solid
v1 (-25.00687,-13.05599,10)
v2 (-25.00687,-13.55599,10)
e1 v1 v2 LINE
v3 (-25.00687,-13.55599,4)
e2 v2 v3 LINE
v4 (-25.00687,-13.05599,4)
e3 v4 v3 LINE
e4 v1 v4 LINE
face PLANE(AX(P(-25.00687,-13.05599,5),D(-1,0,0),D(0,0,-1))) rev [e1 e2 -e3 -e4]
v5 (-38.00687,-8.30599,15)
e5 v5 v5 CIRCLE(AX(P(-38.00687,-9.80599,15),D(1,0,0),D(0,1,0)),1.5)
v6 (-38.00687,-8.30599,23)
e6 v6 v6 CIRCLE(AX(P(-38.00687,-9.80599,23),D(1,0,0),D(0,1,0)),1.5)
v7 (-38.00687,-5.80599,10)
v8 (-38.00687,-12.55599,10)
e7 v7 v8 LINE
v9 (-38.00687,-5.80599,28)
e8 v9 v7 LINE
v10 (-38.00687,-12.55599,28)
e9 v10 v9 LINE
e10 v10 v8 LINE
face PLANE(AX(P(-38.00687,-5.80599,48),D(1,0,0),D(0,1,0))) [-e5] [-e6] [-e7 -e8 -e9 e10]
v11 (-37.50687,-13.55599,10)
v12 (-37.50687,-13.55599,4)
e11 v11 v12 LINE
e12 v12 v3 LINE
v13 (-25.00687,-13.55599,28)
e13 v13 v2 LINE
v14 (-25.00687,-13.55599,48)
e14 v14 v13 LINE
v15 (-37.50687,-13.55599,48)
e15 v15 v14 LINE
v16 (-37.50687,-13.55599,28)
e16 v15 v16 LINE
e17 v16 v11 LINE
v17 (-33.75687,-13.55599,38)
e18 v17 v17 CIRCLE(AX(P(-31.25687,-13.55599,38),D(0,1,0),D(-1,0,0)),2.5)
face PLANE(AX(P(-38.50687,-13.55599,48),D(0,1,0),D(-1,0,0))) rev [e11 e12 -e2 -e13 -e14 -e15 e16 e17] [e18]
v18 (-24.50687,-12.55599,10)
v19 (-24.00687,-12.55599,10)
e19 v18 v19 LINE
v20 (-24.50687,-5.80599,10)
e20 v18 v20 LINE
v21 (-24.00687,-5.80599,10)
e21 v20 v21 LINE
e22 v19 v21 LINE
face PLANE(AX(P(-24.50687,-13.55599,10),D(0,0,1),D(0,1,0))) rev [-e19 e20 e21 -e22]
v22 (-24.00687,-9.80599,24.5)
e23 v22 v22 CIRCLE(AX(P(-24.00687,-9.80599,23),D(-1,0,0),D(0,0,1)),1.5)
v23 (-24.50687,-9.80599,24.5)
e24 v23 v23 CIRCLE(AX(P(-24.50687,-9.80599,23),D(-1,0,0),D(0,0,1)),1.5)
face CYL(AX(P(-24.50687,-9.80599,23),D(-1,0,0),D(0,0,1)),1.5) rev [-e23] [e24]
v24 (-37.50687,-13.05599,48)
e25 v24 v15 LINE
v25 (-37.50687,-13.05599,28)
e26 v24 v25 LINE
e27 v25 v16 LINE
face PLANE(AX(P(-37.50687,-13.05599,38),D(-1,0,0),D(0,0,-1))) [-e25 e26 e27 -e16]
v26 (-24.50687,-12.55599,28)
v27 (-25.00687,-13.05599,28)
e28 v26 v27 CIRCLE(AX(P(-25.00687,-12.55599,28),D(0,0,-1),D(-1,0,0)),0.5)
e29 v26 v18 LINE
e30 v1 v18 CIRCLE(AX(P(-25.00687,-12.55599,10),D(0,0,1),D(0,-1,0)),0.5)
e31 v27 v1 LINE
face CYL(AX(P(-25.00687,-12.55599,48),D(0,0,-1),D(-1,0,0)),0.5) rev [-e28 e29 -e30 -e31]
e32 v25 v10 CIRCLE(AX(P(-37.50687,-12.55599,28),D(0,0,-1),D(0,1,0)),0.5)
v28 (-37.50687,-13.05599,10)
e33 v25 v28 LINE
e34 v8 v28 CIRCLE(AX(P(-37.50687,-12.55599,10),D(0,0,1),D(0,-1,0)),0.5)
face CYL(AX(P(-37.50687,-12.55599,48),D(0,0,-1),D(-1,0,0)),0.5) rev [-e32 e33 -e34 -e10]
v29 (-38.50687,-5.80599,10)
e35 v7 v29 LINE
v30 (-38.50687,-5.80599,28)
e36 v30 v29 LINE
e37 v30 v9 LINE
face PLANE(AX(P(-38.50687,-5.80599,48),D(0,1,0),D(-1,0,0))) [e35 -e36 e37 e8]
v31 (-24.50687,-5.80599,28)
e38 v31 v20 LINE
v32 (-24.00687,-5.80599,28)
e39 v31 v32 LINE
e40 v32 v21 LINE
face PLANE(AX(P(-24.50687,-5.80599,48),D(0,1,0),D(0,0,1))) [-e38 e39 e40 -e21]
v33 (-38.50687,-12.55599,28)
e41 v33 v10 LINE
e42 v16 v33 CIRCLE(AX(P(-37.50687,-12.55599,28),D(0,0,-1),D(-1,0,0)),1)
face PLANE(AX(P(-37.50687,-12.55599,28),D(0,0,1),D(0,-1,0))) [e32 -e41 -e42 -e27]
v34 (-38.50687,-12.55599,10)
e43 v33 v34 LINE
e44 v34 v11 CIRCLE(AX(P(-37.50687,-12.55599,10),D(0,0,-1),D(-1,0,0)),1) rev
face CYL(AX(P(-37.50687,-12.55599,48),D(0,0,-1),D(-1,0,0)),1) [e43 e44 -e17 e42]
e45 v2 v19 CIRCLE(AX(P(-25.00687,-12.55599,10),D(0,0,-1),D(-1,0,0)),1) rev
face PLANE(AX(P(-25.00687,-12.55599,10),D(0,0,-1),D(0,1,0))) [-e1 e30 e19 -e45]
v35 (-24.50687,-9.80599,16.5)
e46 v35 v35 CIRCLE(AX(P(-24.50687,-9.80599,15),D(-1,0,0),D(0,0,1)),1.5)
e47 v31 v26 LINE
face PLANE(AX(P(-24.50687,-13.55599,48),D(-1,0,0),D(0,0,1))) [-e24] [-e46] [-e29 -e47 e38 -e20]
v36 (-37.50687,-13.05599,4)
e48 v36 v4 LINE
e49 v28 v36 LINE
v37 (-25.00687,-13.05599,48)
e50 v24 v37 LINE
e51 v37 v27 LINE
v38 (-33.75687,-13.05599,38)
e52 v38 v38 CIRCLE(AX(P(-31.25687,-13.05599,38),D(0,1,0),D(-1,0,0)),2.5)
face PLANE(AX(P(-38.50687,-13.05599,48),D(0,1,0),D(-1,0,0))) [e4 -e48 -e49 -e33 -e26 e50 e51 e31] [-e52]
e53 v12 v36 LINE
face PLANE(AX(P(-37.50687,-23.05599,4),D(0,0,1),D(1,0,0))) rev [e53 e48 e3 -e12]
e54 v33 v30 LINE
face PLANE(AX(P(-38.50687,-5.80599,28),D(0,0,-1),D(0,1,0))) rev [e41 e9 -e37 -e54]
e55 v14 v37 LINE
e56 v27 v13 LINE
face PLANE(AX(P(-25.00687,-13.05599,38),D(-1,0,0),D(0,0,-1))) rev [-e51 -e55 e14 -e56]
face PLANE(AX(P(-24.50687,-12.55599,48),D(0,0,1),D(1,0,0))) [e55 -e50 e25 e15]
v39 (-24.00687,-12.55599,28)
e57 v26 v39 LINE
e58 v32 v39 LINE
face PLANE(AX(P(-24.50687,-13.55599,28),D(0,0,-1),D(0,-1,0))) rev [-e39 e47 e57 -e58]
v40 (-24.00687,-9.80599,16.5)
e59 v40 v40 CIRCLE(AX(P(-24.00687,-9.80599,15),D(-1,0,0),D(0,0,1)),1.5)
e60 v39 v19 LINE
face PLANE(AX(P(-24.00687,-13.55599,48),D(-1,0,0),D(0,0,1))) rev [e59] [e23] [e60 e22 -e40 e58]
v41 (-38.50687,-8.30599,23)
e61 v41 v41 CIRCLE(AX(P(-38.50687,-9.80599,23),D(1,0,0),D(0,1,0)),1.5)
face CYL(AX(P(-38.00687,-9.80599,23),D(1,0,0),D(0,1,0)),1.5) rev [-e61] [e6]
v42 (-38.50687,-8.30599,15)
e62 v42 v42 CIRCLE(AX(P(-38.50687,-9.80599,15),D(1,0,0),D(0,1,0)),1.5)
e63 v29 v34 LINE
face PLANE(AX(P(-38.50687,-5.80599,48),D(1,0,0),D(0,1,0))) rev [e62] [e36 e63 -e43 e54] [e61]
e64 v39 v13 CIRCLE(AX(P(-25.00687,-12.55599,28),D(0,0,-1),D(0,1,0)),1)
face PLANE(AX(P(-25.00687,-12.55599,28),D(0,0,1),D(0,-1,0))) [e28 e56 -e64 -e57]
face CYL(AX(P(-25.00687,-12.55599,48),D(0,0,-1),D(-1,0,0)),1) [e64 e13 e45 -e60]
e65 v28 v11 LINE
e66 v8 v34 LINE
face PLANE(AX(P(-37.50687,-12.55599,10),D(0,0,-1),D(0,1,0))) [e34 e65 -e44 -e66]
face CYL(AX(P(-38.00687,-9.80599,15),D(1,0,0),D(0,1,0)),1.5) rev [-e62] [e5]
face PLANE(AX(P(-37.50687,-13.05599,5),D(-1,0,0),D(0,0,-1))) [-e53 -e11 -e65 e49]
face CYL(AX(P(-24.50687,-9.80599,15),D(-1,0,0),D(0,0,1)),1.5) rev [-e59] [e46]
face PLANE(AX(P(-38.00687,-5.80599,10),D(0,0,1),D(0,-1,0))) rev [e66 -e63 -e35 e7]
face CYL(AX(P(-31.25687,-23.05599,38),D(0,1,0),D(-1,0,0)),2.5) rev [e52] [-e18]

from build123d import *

# Parameters (mm, degrees)
BRIDA_BASE1_DEPTH           = 48
CROQUIS5_R                  = 2.5
CORTAR_EXTRUIR1_DEPTH       = 10
CORTAR_EXTRUIR2_START       = 28
CORTAR_EXTRUIR2_DEPTH       = 20
CORTAR_EXTRUIR2_2_DEPTH     = 10
CORTAR_EXTRUIR2_START_2     = -38.506869712
CORTAR_EXTRUIR2_3_OUTLINE_R = 1.5
CORTAR_EXTRUIR2_3_DEPTH     = 14.5
CROQUIS7_W                  = 12.5
CROQUIS7_H                  = 4
CORTAR_EXTRUIR4_DEPTH       = 10


with BuildPart() as part:
    # Brida base1: sheet metal written as solids
    # Croquis1 → Brida base1 (new body)
    with BuildSketch(Plane.XY):
        with BuildLine():
            Line((-38.506869712, -5.805989848), (-38.506869712, -12.555989848))
            ThreePointArc((-38.506869712, -12.555989848), (-38.213976494, -13.263096629), (-37.506869712, -13.555989848))
            Line((-37.506869712, -13.555989848), (-25.006869712, -13.555989848))
            ThreePointArc((-25.006869712, -13.555989848), (-24.299762931, -13.263096629), (-24.006869712, -12.555989848))
            Line((-24.006869712, -12.555989848), (-24.006869712, -5.805989848))
            Line((-24.006869712, -5.805989848), (-24.506869712, -5.805989848))
            Line((-24.506869712, -5.805989848), (-24.506869712, -12.555989848))
            ThreePointArc((-24.506869712, -12.555989848), (-24.653316322, -12.909543238), (-25.006869712, -13.055989848))
            Line((-25.006869712, -13.055989848), (-37.506869712, -13.055989848))
            ThreePointArc((-37.506869712, -13.055989848), (-37.860423103, -12.909543238), (-38.006869712, -12.555989848))
            Line((-38.006869712, -12.555989848), (-38.006869712, -5.805989848))
            Line((-38.006869712, -5.805989848), (-38.506869712, -5.805989848))
        make_face()
    extrude(amount=BRIDA_BASE1_DEPTH)

    # Croquis5 → Cortar-Extruir1 (cut)
    with BuildSketch(Plane(origin=(0, -13.055989848, 0), x_dir=(1, 0, 0), z_dir=(0, 1, 0))):
        with Locations(Location((-31.256869712, -38, 0), (0, 0, 180))):
            Circle(CROQUIS5_R)
    extrude(amount=-CORTAR_EXTRUIR1_DEPTH, mode=Mode.SUBTRACT)

    # Cortar-Extruir2: read off the stored shape, not the designer's step
    # Cortar-Extruir2 outline → Cortar-Extruir2 (cut)
    with BuildSketch(Plane.XY.offset(CORTAR_EXTRUIR2_START)):
        with BuildLine():
            Line((-37.506869712, -13.555989848), (-37.506869712, -13.055989848))
            ThreePointArc((-37.506869712, -13.055989848), (-37.860423103, -12.909543239), (-38.006869712, -12.555989848))
            Line((-38.006869712, -12.555989848), (-38.006869712, -5.805989848))
            Line((-38.006869712, -5.805989848), (-38.506869712, -5.805989848))
            Line((-38.506869712, -5.805989848), (-38.506869712, -12.555989848))
            ThreePointArc((-38.506869712, -12.555989848), (-38.213976493, -13.26309663), (-37.506869712, -13.555989848))
        make_face()
        with BuildLine():
            ThreePointArc((-24.506869712, -12.555989848), (-24.653316322, -12.909543238), (-25.006869712, -13.055989848))
            Line((-25.006869712, -13.055989848), (-25.006869712, -13.555989848))
            ThreePointArc((-25.006869712, -13.555989848), (-24.299762931, -13.263096629), (-24.006869712, -12.555989848))
            Line((-24.006869712, -12.555989848), (-24.006869712, -5.805989848))
            Line((-24.006869712, -5.805989848), (-24.506869712, -5.805989848))
            Line((-24.506869712, -5.805989848), (-24.506869712, -12.555989848))
        make_face()
    extrude(amount=CORTAR_EXTRUIR2_DEPTH, mode=Mode.SUBTRACT)

    # Cortar-Extruir2 2 outline → Cortar-Extruir2 2 (cut)
    with BuildSketch(Plane.XY):
        with BuildLine():
            Line((-37.506869712, -13.555989848), (-37.506869712, -13.055989848))
            ThreePointArc((-37.506869712, -13.055989848), (-37.860423103, -12.909543239), (-38.006869712, -12.555989848))
            Line((-38.006869712, -12.555989848), (-38.006869712, -5.805989848))
            Line((-38.006869712, -5.805989848), (-38.506869712, -5.805989848))
            Line((-38.506869712, -5.805989848), (-38.506869712, -12.555989848))
            ThreePointArc((-38.506869712, -12.555989848), (-38.213976493, -13.26309663), (-37.506869712, -13.555989848))
        make_face()
        with BuildLine():
            ThreePointArc((-24.506869712, -12.555989848), (-24.653316322, -12.909543238), (-25.006869712, -13.055989848))
            Line((-25.006869712, -13.055989848), (-25.006869712, -13.555989848))
            ThreePointArc((-25.006869712, -13.555989848), (-24.299762931, -13.263096629), (-24.006869712, -12.555989848))
            Line((-24.006869712, -12.555989848), (-24.006869712, -5.805989848))
            Line((-24.006869712, -5.805989848), (-24.506869712, -5.805989848))
            Line((-24.506869712, -5.805989848), (-24.506869712, -12.555989848))
        make_face()
    extrude(amount=CORTAR_EXTRUIR2_2_DEPTH, mode=Mode.SUBTRACT)

    # Cortar-Extruir2 3 outline → Cortar-Extruir2 3 (cut)
    with BuildSketch(Plane.YZ.offset(CORTAR_EXTRUIR2_START_2)):
        with Locations((-9.805989848, 23)):
            Circle(CORTAR_EXTRUIR2_3_OUTLINE_R)
        with Locations((-9.805989848, 15)):
            Circle(CORTAR_EXTRUIR2_3_OUTLINE_R)
    extrude(amount=CORTAR_EXTRUIR2_3_DEPTH, mode=Mode.SUBTRACT)

    # Croquis7 → Cortar-Extruir4 (cut)
    with BuildSketch(Plane(origin=(0, -13.055989848, 0), x_dir=(1, 0, 0), z_dir=(0, 1, 0))):
        with Locations((-31.256869712, -2)):
            Rectangle(CROQUIS7_W, CROQUIS7_H)
    extrude(amount=-CORTAR_EXTRUIR4_DEPTH, mode=Mode.SUBTRACT)


solid = part.part
